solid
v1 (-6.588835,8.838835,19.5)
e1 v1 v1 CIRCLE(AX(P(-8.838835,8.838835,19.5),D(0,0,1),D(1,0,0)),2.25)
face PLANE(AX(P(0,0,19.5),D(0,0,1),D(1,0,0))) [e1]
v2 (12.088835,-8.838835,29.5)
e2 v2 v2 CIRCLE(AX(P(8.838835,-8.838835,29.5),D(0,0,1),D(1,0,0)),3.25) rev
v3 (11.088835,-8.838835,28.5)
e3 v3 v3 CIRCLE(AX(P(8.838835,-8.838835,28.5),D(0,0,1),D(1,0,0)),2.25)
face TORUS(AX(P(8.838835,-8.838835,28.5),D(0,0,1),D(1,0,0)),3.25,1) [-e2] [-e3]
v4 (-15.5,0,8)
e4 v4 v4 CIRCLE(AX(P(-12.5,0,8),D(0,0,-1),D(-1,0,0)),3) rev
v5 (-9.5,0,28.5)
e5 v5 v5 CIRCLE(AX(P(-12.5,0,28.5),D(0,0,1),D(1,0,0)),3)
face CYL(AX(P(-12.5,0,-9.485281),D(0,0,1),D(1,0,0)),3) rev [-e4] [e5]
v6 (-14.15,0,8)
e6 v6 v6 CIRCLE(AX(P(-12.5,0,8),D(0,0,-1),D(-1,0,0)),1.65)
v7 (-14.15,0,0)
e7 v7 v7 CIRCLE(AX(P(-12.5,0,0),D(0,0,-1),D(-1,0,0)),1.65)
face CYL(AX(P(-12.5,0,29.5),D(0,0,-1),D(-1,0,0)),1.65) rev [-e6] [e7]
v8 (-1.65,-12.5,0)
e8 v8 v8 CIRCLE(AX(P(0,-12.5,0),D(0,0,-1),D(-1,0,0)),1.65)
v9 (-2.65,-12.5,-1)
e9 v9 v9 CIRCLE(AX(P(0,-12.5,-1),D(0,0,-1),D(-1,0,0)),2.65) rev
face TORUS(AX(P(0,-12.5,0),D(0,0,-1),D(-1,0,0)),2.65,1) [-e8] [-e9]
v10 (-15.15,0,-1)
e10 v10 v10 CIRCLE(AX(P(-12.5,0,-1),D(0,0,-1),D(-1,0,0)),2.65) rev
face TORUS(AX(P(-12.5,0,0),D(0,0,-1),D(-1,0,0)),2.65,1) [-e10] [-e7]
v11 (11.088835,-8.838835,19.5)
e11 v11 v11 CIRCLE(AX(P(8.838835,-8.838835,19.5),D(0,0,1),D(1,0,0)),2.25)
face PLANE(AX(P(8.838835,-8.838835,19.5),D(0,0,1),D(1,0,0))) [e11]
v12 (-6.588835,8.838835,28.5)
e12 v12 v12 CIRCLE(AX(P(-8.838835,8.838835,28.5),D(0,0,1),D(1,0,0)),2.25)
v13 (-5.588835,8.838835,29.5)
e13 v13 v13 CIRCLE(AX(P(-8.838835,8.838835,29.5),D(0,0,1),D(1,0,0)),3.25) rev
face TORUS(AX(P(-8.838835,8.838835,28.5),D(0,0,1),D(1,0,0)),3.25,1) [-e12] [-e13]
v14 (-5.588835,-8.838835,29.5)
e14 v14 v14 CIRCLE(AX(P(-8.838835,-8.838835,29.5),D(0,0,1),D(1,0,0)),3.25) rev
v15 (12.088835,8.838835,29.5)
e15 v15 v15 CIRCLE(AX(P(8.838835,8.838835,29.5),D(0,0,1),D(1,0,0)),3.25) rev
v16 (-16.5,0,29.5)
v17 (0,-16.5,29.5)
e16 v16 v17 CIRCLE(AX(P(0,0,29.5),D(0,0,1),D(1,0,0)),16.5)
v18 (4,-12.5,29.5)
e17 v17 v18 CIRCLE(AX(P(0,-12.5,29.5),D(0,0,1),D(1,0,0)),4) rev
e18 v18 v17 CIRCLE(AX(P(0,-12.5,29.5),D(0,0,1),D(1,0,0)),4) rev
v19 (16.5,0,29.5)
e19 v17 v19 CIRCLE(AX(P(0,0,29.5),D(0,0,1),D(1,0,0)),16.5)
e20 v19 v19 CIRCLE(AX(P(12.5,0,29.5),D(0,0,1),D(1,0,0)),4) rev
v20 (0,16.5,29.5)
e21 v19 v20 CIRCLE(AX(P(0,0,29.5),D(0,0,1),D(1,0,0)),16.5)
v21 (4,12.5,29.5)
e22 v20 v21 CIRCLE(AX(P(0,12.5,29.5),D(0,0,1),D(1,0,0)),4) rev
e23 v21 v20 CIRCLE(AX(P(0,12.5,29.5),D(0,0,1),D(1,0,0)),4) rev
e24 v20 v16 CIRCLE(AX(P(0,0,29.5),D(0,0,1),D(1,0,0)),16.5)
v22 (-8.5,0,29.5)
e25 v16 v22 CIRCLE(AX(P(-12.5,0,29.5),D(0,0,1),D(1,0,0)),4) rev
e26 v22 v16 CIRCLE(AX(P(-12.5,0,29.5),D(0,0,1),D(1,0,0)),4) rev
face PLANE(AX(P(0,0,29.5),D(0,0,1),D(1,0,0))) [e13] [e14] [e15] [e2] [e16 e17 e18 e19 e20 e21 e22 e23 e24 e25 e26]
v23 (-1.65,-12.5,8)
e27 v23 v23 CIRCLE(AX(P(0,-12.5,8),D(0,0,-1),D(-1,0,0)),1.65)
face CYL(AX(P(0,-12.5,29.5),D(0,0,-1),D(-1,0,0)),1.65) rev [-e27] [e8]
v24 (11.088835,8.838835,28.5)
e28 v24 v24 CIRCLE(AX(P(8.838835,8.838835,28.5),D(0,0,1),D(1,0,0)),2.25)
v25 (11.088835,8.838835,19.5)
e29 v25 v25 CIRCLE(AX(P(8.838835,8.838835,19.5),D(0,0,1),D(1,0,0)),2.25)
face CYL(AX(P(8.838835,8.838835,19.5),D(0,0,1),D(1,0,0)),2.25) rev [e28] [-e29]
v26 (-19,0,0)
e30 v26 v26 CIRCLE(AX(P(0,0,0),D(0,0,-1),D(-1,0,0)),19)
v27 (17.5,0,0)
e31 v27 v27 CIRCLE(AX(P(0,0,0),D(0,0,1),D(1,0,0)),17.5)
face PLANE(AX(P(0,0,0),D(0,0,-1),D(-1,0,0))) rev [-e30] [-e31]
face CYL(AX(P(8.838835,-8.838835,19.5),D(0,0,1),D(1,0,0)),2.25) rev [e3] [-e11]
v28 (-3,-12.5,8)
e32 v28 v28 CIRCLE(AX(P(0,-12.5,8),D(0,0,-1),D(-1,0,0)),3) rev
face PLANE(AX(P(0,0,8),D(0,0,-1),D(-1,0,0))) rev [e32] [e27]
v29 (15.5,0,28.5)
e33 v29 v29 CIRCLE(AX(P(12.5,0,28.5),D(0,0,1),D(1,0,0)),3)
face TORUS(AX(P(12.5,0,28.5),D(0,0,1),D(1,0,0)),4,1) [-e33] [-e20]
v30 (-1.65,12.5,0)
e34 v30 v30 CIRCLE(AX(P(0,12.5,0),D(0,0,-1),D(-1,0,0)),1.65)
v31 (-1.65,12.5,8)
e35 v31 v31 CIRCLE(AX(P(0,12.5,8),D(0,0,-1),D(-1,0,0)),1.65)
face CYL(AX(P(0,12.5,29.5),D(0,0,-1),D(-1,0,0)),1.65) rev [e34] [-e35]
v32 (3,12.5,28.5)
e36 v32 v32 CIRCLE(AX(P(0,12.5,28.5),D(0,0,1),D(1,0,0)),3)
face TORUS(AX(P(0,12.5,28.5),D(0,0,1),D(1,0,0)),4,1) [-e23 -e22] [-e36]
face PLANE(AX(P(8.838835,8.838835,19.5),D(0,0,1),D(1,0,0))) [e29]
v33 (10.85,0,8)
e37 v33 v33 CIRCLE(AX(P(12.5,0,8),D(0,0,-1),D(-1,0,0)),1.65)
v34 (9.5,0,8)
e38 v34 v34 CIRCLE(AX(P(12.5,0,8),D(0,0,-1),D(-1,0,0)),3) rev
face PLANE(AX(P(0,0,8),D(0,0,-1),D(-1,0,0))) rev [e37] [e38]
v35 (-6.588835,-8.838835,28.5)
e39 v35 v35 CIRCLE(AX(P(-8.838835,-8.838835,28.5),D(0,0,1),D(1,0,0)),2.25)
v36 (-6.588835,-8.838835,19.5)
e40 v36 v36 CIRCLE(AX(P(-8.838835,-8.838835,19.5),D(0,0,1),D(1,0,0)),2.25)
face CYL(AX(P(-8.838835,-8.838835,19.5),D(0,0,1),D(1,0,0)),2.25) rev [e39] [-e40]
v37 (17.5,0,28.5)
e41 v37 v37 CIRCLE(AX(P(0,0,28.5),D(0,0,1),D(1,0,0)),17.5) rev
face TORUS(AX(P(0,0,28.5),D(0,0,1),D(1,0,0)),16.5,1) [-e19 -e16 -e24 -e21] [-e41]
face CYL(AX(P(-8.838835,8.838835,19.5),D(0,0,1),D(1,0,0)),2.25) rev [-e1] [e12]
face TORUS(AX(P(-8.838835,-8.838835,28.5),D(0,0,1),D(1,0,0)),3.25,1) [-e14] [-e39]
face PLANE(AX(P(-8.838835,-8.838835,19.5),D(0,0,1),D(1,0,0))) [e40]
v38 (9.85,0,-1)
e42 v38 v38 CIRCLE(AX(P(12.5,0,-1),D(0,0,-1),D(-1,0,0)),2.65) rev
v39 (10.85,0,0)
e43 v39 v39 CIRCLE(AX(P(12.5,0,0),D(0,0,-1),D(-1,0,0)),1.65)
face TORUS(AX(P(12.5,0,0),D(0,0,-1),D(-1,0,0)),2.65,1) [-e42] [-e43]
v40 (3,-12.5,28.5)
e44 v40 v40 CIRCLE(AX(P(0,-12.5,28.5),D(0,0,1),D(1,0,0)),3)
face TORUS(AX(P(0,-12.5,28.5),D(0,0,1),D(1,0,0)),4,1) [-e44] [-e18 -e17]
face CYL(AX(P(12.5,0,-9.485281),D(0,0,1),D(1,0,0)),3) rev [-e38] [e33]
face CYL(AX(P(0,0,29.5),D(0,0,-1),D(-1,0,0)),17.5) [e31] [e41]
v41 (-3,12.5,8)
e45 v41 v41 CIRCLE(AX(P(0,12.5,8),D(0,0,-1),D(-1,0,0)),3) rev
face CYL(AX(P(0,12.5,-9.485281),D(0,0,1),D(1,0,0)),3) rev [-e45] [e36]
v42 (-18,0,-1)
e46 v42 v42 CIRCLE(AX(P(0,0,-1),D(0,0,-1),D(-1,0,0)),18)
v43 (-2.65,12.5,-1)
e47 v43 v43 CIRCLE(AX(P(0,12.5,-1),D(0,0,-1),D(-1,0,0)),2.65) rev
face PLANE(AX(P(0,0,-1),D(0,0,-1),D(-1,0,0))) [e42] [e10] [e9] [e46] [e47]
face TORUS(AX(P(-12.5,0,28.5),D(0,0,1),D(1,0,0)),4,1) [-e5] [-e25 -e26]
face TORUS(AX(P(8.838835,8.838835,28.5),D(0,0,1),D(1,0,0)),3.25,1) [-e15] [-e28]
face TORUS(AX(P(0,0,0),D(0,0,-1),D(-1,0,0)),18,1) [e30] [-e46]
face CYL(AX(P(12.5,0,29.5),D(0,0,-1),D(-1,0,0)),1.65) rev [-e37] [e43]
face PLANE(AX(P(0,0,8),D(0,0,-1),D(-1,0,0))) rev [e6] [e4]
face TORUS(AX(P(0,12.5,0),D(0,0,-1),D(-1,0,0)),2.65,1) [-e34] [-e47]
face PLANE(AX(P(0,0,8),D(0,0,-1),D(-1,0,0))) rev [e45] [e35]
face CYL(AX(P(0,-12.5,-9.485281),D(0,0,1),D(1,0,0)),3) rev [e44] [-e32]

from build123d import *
from build123d.topology import SkipClean

# Parameters (mm, degrees)
SKIZZE1_R                       = 17.5
SKIZZE1_R_2                     = 1.65
AUFSATZ_LINEAR_AUSTRAGEN1_DEPTH = 29.5
AUFSATZ_LINEAR_START            = 1
SKIZZE2_R                       = 19
SKIZZE2_R_2                     = 1.65
AUFSATZ_LINEAR_AUSTRAGEN2_DEPTH = 1
SKIZZE3_R                       = 3
SCHNITT_LINEAR_AUSTRAGEN1_DEPTH = 21.5
SKIZZE4_R                       = 2.25
SCHNITT_LINEAR_AUSTRAGEN2_DEPTH = 10
VERRUNDUNG1_R                   = 1


with BuildPart() as part:
    # Skizze1 → Aufsatz-Linear austragen1 (new body)
    with BuildSketch(Plane.XY):
        Circle(SKIZZE1_R)
        with Locations((0, -12.5)):
            Circle(SKIZZE1_R_2, mode=Mode.SUBTRACT)
        with Locations((-12.5, 0)):
            Circle(SKIZZE1_R_2, mode=Mode.SUBTRACT)
        with Locations((0, 12.5)):
            Circle(SKIZZE1_R_2, mode=Mode.SUBTRACT)
        with Locations((12.5, 0)):
            Circle(SKIZZE1_R_2, mode=Mode.SUBTRACT)
    extrude(amount=AUFSATZ_LINEAR_AUSTRAGEN1_DEPTH)

    # Skizze2 → Aufsatz-Linear austragen2 (add)
    with SkipClean():  # the faces are left unmerged after this step: merging them gives an invalid solid
        with BuildSketch(Plane(origin=(0, 0, 0), x_dir=(-1, 0, 0), z_dir=(0, 0, -1)).offset(AUFSATZ_LINEAR_START)):
            Circle(SKIZZE2_R)
            with Locations((0, 12.5)):
                Circle(SKIZZE2_R_2, mode=Mode.SUBTRACT)
            with Locations((12.5, 0)):
                Circle(SKIZZE2_R_2, mode=Mode.SUBTRACT)
            with Locations((0, -12.5)):
                Circle(SKIZZE2_R_2, mode=Mode.SUBTRACT)
            with Locations((-12.5, 0)):
                Circle(SKIZZE2_R_2, mode=Mode.SUBTRACT)
        extrude(amount=-AUFSATZ_LINEAR_AUSTRAGEN2_DEPTH)

    # Skizze3 → Schnitt-Linear austragen1 (cut)
    with BuildSketch(Plane.XY.offset(29.5)):
        with Locations((0, 12.5)):
            Circle(SKIZZE3_R)
        with Locations((12.5, 0)):
            Circle(SKIZZE3_R)
        with Locations((0, -12.5)):
            Circle(SKIZZE3_R)
        with Locations((-12.5, 0)):
            Circle(SKIZZE3_R)
    extrude(amount=-SCHNITT_LINEAR_AUSTRAGEN1_DEPTH, mode=Mode.SUBTRACT)

    # Skizze4 → Schnitt-Linear austragen2 (cut)
    with BuildSketch(Plane.XY.offset(29.5)):
        with Locations((8.838834765, 8.838834765)):
            Circle(SKIZZE4_R)
        with Locations((8.838834765, -8.838834765)):
            Circle(SKIZZE4_R)
        with Locations((-8.838834765, -8.838834765)):
            Circle(SKIZZE4_R)
        with Locations((-8.838834765, 8.838834765)):
            Circle(SKIZZE4_R)
    extrude(amount=-SCHNITT_LINEAR_AUSTRAGEN2_DEPTH, mode=Mode.SUBTRACT)

    # Verrundung1
    # the kernel refuses this fillet: 1 mm, written as the material it takes off along each edge
    with BuildSketch(Plane(origin=(0, 0, -1), x_dir=(-1, 0, 0), z_dir=(0, -1, 0))) as verrundung1_piece_1:
        with BuildLine():
            CenterArc((19 - VERRUNDUNG1_R, -VERRUNDUNG1_R), VERRUNDUNG1_R, 0, 90)
            Line((19 - VERRUNDUNG1_R, 0), (19, 0))
            Line((19, 0), (19, -VERRUNDUNG1_R))
        make_face()
    revolve(axis=Axis((0, 0, -1), (0, 0, -1)), mode=Mode.SUBTRACT)
    with BuildSketch(Plane(origin=(0, 12.5, -1), x_dir=(-1, 0, 0), z_dir=(0, -1, 0))) as verrundung1_piece_2:
        with BuildLine():
            CenterArc((1.65 + VERRUNDUNG1_R, -VERRUNDUNG1_R), VERRUNDUNG1_R, 90, 90)
            Line((1.65, -VERRUNDUNG1_R), (1.65, 0))
            Line((1.65, 0), (1.65 + VERRUNDUNG1_R, 0))
        make_face()
    revolve(axis=Axis((0, 12.5, -1), (0, 0, -1)), mode=Mode.SUBTRACT)
    with BuildSketch(Plane(origin=(-12.5, 0, -1), x_dir=(-1, 0, 0), z_dir=(0, -1, 0))) as verrundung1_piece_3:
        with BuildLine():
            CenterArc((1.65 + VERRUNDUNG1_R, -VERRUNDUNG1_R), VERRUNDUNG1_R, 90, 90)
            Line((1.65, -VERRUNDUNG1_R), (1.65, 0))
            Line((1.65, 0), (1.65 + VERRUNDUNG1_R, 0))
        make_face()
    revolve(axis=Axis((-12.5, 0, -1), (0, 0, -1)), mode=Mode.SUBTRACT)
    with BuildSketch(Plane(origin=(0, -12.5, -1), x_dir=(-1, 0, 0), z_dir=(0, -1, 0))) as verrundung1_piece_4:
        with BuildLine():
            CenterArc((1.65 + VERRUNDUNG1_R, -VERRUNDUNG1_R), VERRUNDUNG1_R, 90, 90)
            Line((1.65, -VERRUNDUNG1_R), (1.65, 0))
            Line((1.65, 0), (1.65 + VERRUNDUNG1_R, 0))
        make_face()
    revolve(axis=Axis((0, -12.5, -1), (0, 0, -1)), mode=Mode.SUBTRACT)
    with BuildSketch(Plane(origin=(12.5, 0, -1), x_dir=(-1, 0, 0), z_dir=(0, -1, 0))) as verrundung1_piece_5:
        with BuildLine():
            CenterArc((1.65 + VERRUNDUNG1_R, -VERRUNDUNG1_R), VERRUNDUNG1_R, 90, 90)
            Line((1.65, -VERRUNDUNG1_R), (1.65, 0))
            Line((1.65, 0), (1.65 + VERRUNDUNG1_R, 0))
        make_face()
    revolve(axis=Axis((12.5, 0, -1), (0, 0, -1)), mode=Mode.SUBTRACT)
    with BuildSketch(Plane(origin=(0, 0, 29.5), x_dir=(1, 0, 0), z_dir=(0, -1, 0))) as verrundung1_piece_6:
        with BuildLine():
            CenterArc((17.5 - VERRUNDUNG1_R, -VERRUNDUNG1_R), VERRUNDUNG1_R, 0, 90)
            Line((17.5 - VERRUNDUNG1_R, 0), (17.5, 0))
            Line((17.5, 0), (17.5, -VERRUNDUNG1_R))
        make_face()
    revolve(axis=Axis((0, 0, 29.5), (0, 0, 1)), mode=Mode.SUBTRACT)
    with BuildSketch(Plane(origin=(0, 12.5, 29.5), x_dir=(1, 0, 0), z_dir=(0, -1, 0))) as verrundung1_piece_7:
        with BuildLine():
            CenterArc((3 + VERRUNDUNG1_R, -VERRUNDUNG1_R), VERRUNDUNG1_R, 90, 90)
            Line((3, -VERRUNDUNG1_R), (3, 0))
            Line((3, 0), (3 + VERRUNDUNG1_R, 0))
        make_face()
    revolve(axis=Axis((0, 12.5, 29.5), (0, 0, 1)), mode=Mode.SUBTRACT)
    with BuildSketch(Plane(origin=(12.5, 0, 29.5), x_dir=(1, 0, 0), z_dir=(0, -1, 0))) as verrundung1_piece_8:
        with BuildLine():
            CenterArc((3 + VERRUNDUNG1_R, -VERRUNDUNG1_R), VERRUNDUNG1_R, 90, 90)
            Line((3, -VERRUNDUNG1_R), (3, 0))
            Line((3, 0), (3 + VERRUNDUNG1_R, 0))
        make_face()
    revolve(axis=Axis((12.5, 0, 29.5), (0, 0, 1)), mode=Mode.SUBTRACT)
    with BuildSketch(Plane(origin=(0, -12.5, 29.5), x_dir=(1, 0, 0), z_dir=(0, -1, 0))) as verrundung1_piece_9:
        with BuildLine():
            CenterArc((3 + VERRUNDUNG1_R, -VERRUNDUNG1_R), VERRUNDUNG1_R, 90, 90)
            Line((3, -VERRUNDUNG1_R), (3, 0))
            Line((3, 0), (3 + VERRUNDUNG1_R, 0))
        make_face()
    revolve(axis=Axis((0, -12.5, 29.5), (0, 0, 1)), mode=Mode.SUBTRACT)
    with BuildSketch(Plane(origin=(-12.5, 0, 29.5), x_dir=(1, 0, 0), z_dir=(0, -1, 0))) as verrundung1_piece_10:
        with BuildLine():
            CenterArc((3 + VERRUNDUNG1_R, -VERRUNDUNG1_R), VERRUNDUNG1_R, 90, 90)
            Line((3, -VERRUNDUNG1_R), (3, 0))
            Line((3, 0), (3 + VERRUNDUNG1_R, 0))
        make_face()
    revolve(axis=Axis((-12.5, 0, 29.5), (0, 0, 1)), mode=Mode.SUBTRACT)
    with BuildSketch(Plane(origin=(-8.838834765, -8.838834765, 29.5), x_dir=(1, 0, 0), z_dir=(0, -1, 0))) as verrundung1_piece_11:
        with BuildLine():
            CenterArc((2.25 + VERRUNDUNG1_R, -VERRUNDUNG1_R), VERRUNDUNG1_R, 90, 90)
            Line((2.25, -VERRUNDUNG1_R), (2.25, 0))
            Line((2.25, 0), (2.25 + VERRUNDUNG1_R, 0))
        make_face()
    revolve(axis=Axis((-8.838834765, -8.838834765, 29.5), (0, 0, 1)), mode=Mode.SUBTRACT)
    with BuildSketch(Plane(origin=(8.838834765, -8.838834765, 29.5), x_dir=(1, 0, 0), z_dir=(0, -1, 0))) as verrundung1_piece_12:
        with BuildLine():
            CenterArc((2.25 + VERRUNDUNG1_R, -VERRUNDUNG1_R), VERRUNDUNG1_R, 90, 90)
            Line((2.25, -VERRUNDUNG1_R), (2.25, 0))
            Line((2.25, 0), (2.25 + VERRUNDUNG1_R, 0))
        make_face()
    revolve(axis=Axis((8.838834765, -8.838834765, 29.5), (0, 0, 1)), mode=Mode.SUBTRACT)
    with BuildSketch(Plane(origin=(8.838834765, 8.838834765, 29.5), x_dir=(1, 0, 0), z_dir=(0, -1, 0))) as verrundung1_piece_13:
        with BuildLine():
            CenterArc((2.25 + VERRUNDUNG1_R, -VERRUNDUNG1_R), VERRUNDUNG1_R, 90, 90)
            Line((2.25, -VERRUNDUNG1_R), (2.25, 0))
            Line((2.25, 0), (2.25 + VERRUNDUNG1_R, 0))
        make_face()
    revolve(axis=Axis((8.838834765, 8.838834765, 29.5), (0, 0, 1)), mode=Mode.SUBTRACT)
    with BuildSketch(Plane(origin=(-8.838834765, 8.838834765, 29.5), x_dir=(1, 0, 0), z_dir=(0, -1, 0))) as verrundung1_piece_14:
        with BuildLine():
            CenterArc((2.25 + VERRUNDUNG1_R, -VERRUNDUNG1_R), VERRUNDUNG1_R, 90, 90)
            Line((2.25, -VERRUNDUNG1_R), (2.25, 0))
            Line((2.25, 0), (2.25 + VERRUNDUNG1_R, 0))
        make_face()
    revolve(axis=Axis((-8.838834765, 8.838834765, 29.5), (0, 0, 1)), mode=Mode.SUBTRACT)


solid = part.part
